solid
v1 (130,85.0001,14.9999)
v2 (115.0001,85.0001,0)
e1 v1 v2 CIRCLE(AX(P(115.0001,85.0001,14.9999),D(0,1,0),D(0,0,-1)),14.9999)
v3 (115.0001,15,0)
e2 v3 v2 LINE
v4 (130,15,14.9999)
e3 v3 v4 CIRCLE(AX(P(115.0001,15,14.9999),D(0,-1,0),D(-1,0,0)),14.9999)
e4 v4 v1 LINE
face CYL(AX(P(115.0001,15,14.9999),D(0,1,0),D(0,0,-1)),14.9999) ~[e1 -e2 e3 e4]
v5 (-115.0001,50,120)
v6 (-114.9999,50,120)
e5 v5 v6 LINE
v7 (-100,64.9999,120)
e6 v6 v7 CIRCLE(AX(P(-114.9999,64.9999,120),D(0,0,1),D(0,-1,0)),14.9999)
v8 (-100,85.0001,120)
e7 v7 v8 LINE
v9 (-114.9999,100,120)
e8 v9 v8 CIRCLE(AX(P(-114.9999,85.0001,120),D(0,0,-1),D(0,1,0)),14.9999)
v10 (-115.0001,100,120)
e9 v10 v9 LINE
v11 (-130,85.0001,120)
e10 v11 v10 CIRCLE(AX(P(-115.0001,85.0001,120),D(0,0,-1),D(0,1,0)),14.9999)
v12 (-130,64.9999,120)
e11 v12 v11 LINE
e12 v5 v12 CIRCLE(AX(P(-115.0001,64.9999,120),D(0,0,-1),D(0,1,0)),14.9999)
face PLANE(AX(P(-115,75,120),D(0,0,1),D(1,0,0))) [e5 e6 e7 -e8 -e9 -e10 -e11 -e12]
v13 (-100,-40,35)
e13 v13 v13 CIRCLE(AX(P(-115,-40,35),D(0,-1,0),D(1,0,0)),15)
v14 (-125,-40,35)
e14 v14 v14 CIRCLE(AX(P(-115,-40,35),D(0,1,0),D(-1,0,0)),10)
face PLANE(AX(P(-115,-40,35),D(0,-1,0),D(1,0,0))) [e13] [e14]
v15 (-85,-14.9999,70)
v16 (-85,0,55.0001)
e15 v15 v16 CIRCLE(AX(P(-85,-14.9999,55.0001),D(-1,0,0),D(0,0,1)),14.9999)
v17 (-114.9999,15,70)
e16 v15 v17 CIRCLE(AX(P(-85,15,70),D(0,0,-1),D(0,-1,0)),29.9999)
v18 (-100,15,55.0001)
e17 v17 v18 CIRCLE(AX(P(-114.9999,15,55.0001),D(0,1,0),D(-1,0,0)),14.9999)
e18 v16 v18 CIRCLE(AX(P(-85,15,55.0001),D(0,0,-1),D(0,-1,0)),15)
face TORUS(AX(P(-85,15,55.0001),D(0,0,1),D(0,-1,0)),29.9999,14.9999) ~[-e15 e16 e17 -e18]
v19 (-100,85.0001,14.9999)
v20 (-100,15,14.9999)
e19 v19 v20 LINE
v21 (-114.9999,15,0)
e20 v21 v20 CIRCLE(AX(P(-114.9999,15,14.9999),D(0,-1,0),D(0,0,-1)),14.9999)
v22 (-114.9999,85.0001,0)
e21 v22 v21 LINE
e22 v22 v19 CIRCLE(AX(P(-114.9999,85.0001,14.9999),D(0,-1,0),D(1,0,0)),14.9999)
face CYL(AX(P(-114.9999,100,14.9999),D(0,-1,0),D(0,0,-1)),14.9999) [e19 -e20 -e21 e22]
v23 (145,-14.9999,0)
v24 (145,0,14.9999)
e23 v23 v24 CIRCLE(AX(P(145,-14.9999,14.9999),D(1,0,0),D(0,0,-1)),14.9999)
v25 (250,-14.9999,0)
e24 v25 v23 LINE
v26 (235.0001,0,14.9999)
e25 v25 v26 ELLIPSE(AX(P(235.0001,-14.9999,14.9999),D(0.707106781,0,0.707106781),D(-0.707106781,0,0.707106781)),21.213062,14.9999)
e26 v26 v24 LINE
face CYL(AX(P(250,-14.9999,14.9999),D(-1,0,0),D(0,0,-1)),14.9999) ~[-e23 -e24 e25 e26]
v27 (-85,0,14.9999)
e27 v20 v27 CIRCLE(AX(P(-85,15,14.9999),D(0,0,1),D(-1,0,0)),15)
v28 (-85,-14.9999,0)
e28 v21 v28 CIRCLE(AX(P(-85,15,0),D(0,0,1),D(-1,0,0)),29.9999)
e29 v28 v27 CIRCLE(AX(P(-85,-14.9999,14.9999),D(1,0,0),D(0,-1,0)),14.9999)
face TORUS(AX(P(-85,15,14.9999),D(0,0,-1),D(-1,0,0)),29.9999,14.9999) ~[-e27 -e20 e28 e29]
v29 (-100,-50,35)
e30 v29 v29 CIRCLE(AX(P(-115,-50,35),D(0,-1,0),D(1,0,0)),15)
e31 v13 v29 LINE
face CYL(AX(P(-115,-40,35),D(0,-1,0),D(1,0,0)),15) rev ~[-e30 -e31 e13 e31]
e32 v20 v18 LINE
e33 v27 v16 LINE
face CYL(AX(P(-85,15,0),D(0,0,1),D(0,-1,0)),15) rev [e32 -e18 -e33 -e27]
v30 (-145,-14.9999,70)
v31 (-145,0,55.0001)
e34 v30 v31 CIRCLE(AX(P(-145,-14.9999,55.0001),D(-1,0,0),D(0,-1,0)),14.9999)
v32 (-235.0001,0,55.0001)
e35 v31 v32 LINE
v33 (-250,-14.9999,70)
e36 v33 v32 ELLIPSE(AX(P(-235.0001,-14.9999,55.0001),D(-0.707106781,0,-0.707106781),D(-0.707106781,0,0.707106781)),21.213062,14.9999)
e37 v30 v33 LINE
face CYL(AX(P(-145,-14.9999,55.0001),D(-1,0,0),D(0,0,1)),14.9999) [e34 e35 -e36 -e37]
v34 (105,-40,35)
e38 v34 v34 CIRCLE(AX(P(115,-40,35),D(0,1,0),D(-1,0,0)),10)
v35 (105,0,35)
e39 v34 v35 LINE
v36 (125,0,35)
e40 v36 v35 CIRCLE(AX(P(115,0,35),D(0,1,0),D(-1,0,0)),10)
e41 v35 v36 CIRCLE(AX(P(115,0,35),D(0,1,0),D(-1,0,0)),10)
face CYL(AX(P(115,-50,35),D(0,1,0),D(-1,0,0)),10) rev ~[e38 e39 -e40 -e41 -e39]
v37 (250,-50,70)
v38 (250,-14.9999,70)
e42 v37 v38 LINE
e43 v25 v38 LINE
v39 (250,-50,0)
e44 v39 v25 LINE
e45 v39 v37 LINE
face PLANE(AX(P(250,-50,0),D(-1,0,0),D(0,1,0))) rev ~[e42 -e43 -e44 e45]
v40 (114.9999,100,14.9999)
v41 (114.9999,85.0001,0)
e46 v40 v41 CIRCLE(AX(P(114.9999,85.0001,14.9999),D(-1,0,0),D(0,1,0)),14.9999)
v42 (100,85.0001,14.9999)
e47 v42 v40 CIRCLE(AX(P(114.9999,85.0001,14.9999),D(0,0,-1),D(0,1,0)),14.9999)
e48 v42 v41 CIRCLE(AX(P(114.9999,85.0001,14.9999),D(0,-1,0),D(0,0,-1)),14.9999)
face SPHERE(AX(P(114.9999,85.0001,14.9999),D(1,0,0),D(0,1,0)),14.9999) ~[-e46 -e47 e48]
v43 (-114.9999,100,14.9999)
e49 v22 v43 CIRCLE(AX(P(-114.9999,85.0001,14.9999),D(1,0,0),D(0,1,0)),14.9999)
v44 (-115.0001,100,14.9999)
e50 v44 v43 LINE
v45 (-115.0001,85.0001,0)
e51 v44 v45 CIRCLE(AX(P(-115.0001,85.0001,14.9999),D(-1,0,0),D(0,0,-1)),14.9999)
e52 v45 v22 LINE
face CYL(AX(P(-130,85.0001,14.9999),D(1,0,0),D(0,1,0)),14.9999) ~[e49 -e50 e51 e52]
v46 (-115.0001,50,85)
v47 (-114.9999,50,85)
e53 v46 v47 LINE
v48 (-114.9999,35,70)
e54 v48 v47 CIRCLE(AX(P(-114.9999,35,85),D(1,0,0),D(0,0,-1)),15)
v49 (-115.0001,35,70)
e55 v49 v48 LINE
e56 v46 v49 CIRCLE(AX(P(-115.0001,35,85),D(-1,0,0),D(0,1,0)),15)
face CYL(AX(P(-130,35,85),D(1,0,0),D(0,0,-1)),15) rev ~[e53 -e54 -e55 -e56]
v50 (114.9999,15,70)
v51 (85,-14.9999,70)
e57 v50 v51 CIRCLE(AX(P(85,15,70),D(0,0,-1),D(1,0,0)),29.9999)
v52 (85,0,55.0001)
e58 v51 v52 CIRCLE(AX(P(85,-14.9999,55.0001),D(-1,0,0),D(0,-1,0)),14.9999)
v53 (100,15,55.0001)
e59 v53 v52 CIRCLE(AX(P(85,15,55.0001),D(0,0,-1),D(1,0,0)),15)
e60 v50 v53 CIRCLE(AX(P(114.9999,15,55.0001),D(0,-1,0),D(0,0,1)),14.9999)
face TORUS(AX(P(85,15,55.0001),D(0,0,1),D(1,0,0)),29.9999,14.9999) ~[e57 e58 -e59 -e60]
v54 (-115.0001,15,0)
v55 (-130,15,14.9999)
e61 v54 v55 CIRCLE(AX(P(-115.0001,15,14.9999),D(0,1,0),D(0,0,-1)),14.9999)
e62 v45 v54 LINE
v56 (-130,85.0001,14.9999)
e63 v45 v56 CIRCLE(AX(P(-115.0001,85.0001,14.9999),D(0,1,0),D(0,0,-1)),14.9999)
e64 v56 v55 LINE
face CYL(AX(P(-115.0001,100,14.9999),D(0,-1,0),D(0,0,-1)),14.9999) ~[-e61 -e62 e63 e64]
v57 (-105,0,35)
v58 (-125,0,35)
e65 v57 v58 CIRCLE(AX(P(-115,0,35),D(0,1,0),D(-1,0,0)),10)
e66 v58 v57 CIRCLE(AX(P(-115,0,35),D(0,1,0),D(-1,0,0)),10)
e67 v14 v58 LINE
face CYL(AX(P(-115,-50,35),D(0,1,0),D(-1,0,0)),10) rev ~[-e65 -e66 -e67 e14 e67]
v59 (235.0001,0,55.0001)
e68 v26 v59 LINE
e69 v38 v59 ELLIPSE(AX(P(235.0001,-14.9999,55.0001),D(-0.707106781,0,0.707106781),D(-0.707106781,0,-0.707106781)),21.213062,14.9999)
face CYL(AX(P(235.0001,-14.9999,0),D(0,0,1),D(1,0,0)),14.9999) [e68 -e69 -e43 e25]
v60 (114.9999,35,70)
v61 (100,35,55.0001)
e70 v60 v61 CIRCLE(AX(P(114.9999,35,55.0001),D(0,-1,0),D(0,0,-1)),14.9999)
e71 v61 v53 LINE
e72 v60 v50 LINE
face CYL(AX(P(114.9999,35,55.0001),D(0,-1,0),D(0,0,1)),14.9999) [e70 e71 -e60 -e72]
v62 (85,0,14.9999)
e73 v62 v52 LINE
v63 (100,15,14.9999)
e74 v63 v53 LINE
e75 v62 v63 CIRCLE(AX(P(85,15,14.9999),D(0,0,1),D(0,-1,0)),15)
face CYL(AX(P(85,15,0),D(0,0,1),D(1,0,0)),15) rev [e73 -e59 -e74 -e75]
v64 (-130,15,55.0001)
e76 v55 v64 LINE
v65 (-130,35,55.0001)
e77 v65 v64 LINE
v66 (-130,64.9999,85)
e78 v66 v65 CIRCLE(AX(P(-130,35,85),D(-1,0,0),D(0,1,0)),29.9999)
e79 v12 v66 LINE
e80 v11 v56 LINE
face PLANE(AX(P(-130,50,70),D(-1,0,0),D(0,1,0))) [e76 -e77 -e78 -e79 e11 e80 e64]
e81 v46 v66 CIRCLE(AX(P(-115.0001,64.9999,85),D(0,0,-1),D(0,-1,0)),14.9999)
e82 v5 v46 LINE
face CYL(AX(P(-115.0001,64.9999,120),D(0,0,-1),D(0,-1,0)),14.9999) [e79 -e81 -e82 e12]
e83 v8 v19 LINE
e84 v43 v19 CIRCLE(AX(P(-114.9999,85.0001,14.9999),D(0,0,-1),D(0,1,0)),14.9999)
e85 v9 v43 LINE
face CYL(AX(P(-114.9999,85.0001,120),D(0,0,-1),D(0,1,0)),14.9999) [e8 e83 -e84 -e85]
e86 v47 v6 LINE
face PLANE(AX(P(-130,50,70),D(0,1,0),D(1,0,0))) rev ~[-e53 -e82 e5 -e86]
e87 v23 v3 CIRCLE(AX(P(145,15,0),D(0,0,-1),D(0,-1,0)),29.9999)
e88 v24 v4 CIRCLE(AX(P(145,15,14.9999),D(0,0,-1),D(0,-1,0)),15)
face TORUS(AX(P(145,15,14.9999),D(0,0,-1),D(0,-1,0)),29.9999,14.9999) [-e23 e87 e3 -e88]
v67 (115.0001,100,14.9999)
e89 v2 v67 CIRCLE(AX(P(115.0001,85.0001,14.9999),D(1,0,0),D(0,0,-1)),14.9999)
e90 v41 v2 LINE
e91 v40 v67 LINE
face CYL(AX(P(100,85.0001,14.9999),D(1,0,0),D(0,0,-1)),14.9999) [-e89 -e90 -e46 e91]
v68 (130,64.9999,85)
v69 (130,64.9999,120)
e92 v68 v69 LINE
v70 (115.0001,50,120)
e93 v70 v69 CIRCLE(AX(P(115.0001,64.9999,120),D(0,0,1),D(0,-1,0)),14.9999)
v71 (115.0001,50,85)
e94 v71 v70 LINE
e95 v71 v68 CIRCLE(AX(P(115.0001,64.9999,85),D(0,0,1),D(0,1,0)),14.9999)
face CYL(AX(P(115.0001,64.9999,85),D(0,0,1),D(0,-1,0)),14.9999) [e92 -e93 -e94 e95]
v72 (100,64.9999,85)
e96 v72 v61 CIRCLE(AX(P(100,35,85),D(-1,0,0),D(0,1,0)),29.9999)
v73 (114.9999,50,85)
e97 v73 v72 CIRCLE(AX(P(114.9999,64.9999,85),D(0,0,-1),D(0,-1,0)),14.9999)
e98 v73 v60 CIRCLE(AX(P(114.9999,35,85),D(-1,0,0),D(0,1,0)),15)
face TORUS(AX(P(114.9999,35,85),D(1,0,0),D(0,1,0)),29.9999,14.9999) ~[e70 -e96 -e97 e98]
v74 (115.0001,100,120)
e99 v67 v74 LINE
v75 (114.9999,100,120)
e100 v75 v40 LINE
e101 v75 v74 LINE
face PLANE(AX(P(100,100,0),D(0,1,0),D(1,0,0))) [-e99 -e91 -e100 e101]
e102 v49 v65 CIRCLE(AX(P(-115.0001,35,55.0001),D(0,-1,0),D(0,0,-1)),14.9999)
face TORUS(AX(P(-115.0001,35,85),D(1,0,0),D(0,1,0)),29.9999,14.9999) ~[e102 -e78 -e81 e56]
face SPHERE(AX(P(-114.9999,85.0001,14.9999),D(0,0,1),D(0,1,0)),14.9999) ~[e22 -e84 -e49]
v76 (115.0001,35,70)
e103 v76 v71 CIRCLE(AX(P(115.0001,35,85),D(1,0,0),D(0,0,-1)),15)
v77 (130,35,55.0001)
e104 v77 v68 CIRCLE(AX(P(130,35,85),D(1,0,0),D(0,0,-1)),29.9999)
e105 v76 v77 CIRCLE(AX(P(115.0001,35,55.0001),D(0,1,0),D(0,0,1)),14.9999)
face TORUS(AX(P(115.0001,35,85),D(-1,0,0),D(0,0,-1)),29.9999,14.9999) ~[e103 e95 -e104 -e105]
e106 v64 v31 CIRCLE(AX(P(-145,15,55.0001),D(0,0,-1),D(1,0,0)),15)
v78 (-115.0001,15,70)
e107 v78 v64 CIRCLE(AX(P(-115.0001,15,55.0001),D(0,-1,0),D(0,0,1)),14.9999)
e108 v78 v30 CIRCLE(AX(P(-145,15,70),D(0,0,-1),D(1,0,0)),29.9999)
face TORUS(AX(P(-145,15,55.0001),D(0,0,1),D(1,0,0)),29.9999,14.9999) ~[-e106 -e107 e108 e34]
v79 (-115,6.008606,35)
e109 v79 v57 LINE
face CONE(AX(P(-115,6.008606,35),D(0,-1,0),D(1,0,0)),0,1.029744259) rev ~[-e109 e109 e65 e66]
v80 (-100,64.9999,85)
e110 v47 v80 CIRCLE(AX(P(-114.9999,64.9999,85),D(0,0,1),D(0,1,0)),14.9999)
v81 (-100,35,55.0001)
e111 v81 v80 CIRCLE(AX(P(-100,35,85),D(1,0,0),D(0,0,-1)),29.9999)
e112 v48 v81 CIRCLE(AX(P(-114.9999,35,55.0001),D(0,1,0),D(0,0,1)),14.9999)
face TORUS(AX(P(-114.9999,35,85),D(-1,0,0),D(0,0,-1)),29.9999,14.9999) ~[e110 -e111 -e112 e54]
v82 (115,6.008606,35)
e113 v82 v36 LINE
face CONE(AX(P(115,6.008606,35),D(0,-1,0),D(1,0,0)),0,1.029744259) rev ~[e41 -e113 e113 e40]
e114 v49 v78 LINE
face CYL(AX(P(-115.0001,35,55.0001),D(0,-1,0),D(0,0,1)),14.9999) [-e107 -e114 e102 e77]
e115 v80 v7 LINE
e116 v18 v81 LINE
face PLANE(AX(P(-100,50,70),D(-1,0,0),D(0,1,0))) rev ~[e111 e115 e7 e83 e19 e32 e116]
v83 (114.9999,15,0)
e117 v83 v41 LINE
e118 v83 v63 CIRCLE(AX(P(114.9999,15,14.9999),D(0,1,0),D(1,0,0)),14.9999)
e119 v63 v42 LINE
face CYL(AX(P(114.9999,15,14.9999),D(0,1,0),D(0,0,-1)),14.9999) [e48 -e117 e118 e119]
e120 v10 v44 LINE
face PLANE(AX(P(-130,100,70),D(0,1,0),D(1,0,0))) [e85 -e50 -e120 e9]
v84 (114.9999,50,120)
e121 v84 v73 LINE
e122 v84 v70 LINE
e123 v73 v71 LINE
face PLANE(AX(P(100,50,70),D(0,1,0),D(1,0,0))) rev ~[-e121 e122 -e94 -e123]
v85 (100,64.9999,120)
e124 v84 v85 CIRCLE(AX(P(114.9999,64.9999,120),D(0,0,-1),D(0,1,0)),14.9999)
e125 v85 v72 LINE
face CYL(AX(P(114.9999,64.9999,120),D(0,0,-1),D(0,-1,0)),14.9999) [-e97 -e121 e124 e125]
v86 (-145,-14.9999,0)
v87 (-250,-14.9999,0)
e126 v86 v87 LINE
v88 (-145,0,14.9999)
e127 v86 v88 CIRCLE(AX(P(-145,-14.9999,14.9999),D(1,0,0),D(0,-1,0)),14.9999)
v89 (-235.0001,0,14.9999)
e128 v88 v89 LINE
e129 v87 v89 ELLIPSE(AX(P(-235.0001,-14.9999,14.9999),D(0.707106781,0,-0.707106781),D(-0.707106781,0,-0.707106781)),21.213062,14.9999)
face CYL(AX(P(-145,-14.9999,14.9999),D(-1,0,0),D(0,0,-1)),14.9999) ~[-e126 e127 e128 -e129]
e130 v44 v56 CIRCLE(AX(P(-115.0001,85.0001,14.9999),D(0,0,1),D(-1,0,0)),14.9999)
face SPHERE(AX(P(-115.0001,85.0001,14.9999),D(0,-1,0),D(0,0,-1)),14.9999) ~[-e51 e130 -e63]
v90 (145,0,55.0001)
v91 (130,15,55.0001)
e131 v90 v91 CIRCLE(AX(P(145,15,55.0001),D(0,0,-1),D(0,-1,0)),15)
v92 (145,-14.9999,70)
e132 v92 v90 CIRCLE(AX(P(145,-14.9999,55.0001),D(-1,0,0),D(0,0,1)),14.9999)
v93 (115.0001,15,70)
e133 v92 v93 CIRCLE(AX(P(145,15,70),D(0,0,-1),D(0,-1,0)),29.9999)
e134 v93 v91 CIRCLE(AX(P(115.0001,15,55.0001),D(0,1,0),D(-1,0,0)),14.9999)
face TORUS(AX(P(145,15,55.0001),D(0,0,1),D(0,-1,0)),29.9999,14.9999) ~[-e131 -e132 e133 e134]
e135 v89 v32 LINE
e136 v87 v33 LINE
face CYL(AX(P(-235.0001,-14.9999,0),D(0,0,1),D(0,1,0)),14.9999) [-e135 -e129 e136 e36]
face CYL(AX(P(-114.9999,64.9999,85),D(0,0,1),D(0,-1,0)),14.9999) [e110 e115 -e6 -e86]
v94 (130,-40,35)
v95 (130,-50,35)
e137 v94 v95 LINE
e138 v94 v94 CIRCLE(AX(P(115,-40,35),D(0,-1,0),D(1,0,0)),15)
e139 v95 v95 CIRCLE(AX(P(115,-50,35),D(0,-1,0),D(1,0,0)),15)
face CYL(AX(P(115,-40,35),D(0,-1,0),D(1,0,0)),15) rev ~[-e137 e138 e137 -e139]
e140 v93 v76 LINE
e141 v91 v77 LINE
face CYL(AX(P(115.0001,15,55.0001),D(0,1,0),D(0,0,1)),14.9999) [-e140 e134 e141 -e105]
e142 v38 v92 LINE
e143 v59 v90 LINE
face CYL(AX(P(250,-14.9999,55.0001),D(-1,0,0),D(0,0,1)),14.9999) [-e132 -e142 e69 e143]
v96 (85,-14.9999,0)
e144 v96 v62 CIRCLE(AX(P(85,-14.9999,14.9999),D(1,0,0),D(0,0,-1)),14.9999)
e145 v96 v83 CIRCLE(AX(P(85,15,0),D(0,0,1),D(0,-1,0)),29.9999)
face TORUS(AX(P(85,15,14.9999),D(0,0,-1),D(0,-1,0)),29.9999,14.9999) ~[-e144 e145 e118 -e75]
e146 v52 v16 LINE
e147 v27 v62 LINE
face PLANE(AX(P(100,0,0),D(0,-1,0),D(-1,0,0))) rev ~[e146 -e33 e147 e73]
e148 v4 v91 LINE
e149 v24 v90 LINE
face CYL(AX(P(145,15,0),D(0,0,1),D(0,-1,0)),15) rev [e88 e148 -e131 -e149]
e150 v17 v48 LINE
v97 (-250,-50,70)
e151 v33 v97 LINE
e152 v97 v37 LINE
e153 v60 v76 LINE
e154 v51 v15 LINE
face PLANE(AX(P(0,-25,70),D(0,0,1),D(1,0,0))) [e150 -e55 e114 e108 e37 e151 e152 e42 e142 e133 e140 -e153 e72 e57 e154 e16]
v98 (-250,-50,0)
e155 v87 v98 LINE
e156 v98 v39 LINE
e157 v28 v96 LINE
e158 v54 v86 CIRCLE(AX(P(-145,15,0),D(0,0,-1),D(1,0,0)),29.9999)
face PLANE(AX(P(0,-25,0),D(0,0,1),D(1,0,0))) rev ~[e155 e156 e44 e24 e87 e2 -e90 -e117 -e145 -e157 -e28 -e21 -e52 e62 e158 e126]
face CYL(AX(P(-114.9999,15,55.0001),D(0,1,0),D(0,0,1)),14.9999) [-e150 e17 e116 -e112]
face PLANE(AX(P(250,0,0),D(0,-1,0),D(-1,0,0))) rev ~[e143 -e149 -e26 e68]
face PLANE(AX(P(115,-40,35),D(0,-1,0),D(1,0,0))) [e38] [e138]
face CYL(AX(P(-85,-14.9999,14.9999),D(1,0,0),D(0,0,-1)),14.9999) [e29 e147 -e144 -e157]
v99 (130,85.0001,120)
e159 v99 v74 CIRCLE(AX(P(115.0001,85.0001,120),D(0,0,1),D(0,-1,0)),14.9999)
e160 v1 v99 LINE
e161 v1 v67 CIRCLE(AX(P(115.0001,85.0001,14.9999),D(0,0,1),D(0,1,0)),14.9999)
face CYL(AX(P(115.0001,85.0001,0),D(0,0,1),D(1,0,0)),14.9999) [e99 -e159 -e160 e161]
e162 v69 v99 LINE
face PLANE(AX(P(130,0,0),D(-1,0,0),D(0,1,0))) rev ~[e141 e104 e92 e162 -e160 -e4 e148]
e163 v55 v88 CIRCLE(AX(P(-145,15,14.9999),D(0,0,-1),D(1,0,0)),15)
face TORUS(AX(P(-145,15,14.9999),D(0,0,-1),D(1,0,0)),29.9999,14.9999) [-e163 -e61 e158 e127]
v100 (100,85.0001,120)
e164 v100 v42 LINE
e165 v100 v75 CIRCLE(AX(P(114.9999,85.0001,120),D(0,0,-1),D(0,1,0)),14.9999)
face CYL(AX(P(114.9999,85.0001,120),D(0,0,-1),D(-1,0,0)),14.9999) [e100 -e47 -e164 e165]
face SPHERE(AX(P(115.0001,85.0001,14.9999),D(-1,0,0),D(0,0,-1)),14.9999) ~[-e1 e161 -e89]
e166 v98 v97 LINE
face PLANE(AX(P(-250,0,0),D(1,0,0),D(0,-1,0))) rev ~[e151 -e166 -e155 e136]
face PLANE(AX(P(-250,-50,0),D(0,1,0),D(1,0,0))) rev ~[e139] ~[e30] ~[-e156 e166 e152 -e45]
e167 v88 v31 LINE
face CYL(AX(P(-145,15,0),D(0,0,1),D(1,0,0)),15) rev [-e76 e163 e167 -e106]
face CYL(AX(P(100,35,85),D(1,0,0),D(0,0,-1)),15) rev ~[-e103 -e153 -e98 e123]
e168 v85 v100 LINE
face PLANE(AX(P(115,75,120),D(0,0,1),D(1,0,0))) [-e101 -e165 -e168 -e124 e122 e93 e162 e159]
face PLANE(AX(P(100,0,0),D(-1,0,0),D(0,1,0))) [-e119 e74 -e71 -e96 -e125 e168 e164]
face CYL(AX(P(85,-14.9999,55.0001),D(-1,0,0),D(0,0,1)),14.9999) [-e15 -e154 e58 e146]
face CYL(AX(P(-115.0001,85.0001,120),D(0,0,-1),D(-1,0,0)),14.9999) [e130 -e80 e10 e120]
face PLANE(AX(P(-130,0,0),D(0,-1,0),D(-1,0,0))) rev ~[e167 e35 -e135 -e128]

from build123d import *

# Parameters (mm, degrees)
F0_W           = 30
F0_H           = 100
F1_DEPTH       = 70
F2_W           = 30
F2_H           = 50
F3_DEPTH       = 50
F4_F1_R        = 15
F4_F2_R        = 14.9999
F6_D           = 20
F6_DEPTH       = 50
F6_CBORE_D     = 30
F6_CBORE_DEPTH = 10
F6_TIP         = 6.0086061903


# Not quite as in the source:
# - a fillet or chamfer is up to 0.001 mm smaller than in the source, because OpenCascade refuses the exact size


with BuildPart() as f1:
    # F0 (on Top) → F1 (new body)
    with BuildSketch(Plane.XY):
        Polygon((-130, 0), (-250, 0), (-250, -50), (250, -50), (250, 0), (130, 0), (100, 0), (-100, 0), align=None)
        with Locations((-115, 50)):
            Rectangle(F0_W, F0_H)
        with Locations((115, 50)):
            Rectangle(F0_W, F0_H)
    extrude(amount=F1_DEPTH)

    # F2 (on face) → F3 (join)
    with BuildSketch(Plane.XY.offset(70)):
        with Locations((-115, 75)):
            Rectangle(F2_W, F2_H)
        with Locations((115, 75)):
            Rectangle(F2_W, F2_H)
    extrude(amount=F3_DEPTH)

    # F4: fillet of radius 15 on 24 edges, made by hand

    # F4_f1
    f4_f1_edges = [f1.edges().sort_by_distance(p)[0] for p in [
        (-115, 50, 70),
        (115, 50, 70),
        (100, 0, 35),
        (-130, 0, 35),
        (-100, 0, 35),
        (130, 0, 35),
    ]]
    fillet(f4_f1_edges, radius=F4_F1_R)

    # F4_f2 (radius 15 in the source; OpenCascade refuses exactly that, so slightly less here)
    f4_f2_edges = [f1.edges().sort_by_distance(p)[0] for p in [
        (-197.5, 0, 70),
        (115, 100, 0),
        (197.5, 0, 0),
        (197.5, 0, 70),
        (250, 0, 35),
        (130, 100, 60),
        (100, 100, 60),
        (-197.5, 0, 0),
        (-250, 0, 35),
        (-100, 100, 60),
        (-115, 100, 0),
        (-130, 100, 60),
        (0, 0, 70),
        (130, 57.5, 0),
        (100, 57.5, 0),
        (0, 0, 0),
        (-100, 57.5, 0),
        (-130, 57.5, 0),
        (-134.3933982822, 4.3933982822, 0),
        (-95.6066017178, 4.3933982822, 0),
        (95.6066017178, 4.3933982822, 0),
        (134.3933982822, 4.3933982822, 0),
        (95.6066017178, 4.3933982822, 70),
        (-95.6066017178, 4.3933982822, 70),
        (134.3933982822, 4.3933982822, 70),
        (-134.3933982822, 4.3933982822, 70),
    ]]
    fillet(f4_f2_edges, radius=F4_F2_R)

    # F6
    with Locations(Plane.XZ.offset(50)):
        with Locations((-114.9999999844, 35), (115.0000000156, 35)):
            CounterBoreHole(F6_D / 2, F6_CBORE_D / 2, F6_CBORE_DEPTH, depth=F6_DEPTH)
            with Locations((0, 0, -(F6_DEPTH + F6_TIP / 2))):  # 118° drill point
                Cone(0, F6_D / 2, F6_TIP, mode=Mode.SUBTRACT)


solid = f1.part
